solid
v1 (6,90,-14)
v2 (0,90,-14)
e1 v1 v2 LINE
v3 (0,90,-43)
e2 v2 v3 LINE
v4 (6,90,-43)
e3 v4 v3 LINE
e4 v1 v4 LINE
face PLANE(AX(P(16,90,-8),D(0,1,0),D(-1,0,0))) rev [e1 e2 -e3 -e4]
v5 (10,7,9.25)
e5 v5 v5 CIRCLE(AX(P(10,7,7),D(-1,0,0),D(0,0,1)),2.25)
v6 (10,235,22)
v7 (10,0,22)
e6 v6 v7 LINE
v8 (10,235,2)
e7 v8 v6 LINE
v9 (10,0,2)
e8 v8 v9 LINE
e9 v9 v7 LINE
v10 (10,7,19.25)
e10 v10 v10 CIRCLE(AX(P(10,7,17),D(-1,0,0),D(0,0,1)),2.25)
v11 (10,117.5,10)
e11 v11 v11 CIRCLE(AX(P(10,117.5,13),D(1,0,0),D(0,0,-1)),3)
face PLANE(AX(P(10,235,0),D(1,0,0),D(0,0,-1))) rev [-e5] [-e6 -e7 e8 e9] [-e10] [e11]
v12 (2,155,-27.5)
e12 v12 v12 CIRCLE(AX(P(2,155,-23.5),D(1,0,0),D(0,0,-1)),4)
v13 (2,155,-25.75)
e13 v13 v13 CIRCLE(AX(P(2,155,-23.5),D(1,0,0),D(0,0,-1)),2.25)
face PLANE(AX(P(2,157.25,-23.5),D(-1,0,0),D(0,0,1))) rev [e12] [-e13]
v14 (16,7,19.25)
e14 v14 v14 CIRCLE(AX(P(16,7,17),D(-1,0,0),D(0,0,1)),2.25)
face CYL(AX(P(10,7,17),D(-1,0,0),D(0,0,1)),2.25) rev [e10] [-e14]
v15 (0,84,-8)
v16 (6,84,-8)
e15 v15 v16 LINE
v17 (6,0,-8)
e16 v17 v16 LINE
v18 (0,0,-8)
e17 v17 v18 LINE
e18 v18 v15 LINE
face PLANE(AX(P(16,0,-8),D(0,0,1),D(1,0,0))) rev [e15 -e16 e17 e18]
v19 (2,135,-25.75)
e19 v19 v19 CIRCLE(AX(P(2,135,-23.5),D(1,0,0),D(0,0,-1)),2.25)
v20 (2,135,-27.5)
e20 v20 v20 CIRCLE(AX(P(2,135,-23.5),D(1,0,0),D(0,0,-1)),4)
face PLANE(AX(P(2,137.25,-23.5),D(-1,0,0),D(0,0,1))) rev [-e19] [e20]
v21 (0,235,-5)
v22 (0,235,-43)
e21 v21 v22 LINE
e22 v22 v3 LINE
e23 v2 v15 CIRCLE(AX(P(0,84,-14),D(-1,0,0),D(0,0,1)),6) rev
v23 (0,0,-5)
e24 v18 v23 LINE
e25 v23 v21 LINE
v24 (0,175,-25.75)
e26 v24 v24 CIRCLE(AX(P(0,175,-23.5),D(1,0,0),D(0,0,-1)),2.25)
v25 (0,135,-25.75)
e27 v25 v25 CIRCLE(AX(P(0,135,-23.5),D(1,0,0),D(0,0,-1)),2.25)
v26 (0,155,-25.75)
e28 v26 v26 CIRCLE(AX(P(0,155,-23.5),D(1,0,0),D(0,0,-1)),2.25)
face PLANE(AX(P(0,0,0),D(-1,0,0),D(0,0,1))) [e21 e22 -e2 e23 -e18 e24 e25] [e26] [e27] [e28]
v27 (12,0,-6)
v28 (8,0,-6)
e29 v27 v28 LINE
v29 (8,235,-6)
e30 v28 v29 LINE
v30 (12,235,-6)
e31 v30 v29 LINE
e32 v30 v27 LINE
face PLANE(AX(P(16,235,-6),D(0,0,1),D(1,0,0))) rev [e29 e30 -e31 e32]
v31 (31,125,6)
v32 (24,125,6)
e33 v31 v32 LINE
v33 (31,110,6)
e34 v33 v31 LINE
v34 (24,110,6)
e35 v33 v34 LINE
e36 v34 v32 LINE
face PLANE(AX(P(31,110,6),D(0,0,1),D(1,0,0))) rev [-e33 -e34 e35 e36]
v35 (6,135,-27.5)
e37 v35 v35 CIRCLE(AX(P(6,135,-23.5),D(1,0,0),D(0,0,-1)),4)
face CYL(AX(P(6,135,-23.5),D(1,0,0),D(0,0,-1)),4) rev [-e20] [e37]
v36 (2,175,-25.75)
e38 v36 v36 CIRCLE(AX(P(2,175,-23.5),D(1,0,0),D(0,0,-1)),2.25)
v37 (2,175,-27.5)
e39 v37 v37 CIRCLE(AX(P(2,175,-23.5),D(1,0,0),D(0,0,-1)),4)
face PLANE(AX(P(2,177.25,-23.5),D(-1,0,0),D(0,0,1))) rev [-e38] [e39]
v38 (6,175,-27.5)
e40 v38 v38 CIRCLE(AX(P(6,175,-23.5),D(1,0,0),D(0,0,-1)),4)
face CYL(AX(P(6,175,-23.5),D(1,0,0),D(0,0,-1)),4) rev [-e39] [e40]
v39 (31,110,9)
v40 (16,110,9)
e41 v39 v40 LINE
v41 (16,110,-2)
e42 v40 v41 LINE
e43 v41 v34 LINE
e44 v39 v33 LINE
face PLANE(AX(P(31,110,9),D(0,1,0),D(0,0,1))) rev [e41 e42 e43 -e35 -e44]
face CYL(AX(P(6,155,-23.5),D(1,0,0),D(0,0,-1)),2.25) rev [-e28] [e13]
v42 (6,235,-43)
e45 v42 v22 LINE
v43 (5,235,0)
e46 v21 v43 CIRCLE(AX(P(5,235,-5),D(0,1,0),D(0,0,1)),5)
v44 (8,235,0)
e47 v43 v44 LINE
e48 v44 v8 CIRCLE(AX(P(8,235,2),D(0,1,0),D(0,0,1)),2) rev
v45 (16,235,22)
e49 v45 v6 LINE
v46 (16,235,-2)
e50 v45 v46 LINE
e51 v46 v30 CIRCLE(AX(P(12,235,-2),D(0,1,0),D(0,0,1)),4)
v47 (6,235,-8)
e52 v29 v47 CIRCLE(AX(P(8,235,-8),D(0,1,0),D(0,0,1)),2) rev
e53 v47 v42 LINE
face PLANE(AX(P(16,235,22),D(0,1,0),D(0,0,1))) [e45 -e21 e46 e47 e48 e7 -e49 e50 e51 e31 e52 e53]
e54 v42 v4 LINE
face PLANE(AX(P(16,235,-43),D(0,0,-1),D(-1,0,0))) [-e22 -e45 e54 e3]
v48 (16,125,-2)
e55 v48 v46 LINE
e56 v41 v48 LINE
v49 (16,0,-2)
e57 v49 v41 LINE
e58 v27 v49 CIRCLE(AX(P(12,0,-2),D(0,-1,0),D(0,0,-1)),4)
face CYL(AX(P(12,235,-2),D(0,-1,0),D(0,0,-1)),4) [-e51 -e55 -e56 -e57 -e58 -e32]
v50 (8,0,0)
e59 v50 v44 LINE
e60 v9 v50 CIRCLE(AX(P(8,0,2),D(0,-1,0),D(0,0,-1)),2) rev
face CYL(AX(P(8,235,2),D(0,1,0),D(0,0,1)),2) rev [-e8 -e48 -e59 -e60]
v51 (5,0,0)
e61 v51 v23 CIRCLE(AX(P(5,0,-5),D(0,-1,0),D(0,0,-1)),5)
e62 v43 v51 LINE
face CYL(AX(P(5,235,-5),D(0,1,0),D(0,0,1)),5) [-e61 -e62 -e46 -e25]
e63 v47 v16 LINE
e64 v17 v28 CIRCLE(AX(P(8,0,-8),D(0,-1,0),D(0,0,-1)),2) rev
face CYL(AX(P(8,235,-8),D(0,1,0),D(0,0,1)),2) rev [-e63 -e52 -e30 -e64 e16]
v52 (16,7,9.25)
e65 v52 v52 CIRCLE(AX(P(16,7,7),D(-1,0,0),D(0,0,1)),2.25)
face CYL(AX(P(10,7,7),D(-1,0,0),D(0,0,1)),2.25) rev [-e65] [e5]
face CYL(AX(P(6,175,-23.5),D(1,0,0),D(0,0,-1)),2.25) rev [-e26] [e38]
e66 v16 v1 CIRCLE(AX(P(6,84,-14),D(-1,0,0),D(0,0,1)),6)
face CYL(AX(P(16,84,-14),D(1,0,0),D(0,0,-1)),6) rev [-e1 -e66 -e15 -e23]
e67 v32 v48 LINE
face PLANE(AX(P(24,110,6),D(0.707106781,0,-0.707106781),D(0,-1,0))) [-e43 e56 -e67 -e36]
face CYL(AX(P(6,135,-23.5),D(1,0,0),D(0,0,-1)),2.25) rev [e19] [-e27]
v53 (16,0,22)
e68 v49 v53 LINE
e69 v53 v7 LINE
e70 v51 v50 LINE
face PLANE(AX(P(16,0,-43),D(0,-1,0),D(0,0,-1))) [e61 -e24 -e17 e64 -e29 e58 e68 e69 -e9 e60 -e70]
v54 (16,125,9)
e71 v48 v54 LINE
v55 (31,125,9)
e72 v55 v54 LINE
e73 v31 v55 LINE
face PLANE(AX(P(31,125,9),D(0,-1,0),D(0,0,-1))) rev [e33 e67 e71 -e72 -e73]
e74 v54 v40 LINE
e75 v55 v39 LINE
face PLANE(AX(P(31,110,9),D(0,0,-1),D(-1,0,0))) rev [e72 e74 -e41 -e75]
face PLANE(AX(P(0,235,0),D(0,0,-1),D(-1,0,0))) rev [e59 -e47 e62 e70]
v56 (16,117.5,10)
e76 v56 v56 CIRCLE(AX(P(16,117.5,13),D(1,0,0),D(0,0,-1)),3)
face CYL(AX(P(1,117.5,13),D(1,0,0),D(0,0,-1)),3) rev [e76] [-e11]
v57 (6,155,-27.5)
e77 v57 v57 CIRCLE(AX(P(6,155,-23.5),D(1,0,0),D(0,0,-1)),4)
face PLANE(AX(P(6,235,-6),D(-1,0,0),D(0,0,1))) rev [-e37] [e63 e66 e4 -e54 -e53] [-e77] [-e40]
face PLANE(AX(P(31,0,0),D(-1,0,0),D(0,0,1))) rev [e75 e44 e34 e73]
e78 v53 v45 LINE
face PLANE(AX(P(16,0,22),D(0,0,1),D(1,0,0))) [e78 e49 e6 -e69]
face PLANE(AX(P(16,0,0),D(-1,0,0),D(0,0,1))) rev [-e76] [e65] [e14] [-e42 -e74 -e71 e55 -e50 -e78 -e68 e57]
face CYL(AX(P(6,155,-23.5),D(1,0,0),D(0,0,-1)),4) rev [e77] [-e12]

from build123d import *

# Parameters (mm, degrees)
SCHIZZO1_W                                           = 235
SCHIZZO1_H                                           = 65
ESTRUSIONE_ESTRUSIONE1_DEPTH                         = 16
SCHIZZO2_W                                           = 10
SCHIZZO2_H                                           = 37
TAGLIO_ESTRUSIONE1_DEPTH                             = 240.436839271
SCHIZZO3_W                                           = 35
SCHIZZO3_H                                           = 90
TAGLIO_ESTRUSIONE2_DEPTH                             = 240.436839271
SCHIZZO4_W                                           = 10
SCHIZZO4_H                                           = 22
TAGLIO_ESTRUSIONE3_DEPTH                             = 240.436839271
FORO_LAMATO_PER_VITE_M4_A_TESTA_ESAGONAL_D           = 4.5
FORO_LAMATO_PER_VITE_M4_A_TESTA_ESAGONAL_CBORE_D     = 8
FORO_LAMATO_PER_VITE_M4_A_TESTA_ESAGONAL_CBORE_DEPTH = 4
RACCORDO1_R                                          = 2
RACCORDO2_R                                          = 4
RACCORDO3_R                                          = 5
RACCORDO4_R                                          = 6
FORO_PER_VITE_M4_1_D                                 = 4.5
FORO_PER_VITE_M4_1_DEPTH                             = 188
FORO_PER_VITE_M4_1_TIP                               = 1.351936393
SCHIZZO9_W                                           = 3
SCHIZZO9_H                                           = 15
ESTRUSIONE_ESTRUSIONE2_DEPTH                         = 15
SCHIZZO10_R                                          = 3
TAGLIO_ESTRUSIONE4_DEPTH                             = 15
SMUSSO1_SIZE                                         = 8


with BuildPart() as part:
    # Schizzo1 → Estrusione-Estrusione1 (new body)
    with BuildSketch(Plane(origin=(0, 0, 0), x_dir=(0, -1, 0), z_dir=(-1, 0, 0))):
        with Locations((-117.5, -10.5)):
            Rectangle(SCHIZZO1_W, SCHIZZO1_H)
    extrude(amount=-ESTRUSIONE_ESTRUSIONE1_DEPTH)

    # Schizzo2 → Taglio-Estrusione1 (cut, through all)
    with BuildSketch(Plane.XZ):
        with Locations((11, -24.5)):
            Rectangle(SCHIZZO2_W, SCHIZZO2_H)
    extrude(amount=-TAGLIO_ESTRUSIONE1_DEPTH, mode=Mode.SUBTRACT)

    # Schizzo3 → Taglio-Estrusione2 (cut, through all)
    with BuildSketch(Plane.ZY):
        with Locations((-25.5, 45)):
            Rectangle(SCHIZZO3_W, SCHIZZO3_H)
    extrude(amount=-TAGLIO_ESTRUSIONE2_DEPTH, mode=Mode.SUBTRACT)

    # Schizzo4 → Taglio-Estrusione3 (cut, through all)
    with BuildSketch(Plane.XZ):
        with Locations((5, 11)):
            Rectangle(SCHIZZO4_W, SCHIZZO4_H)
    extrude(amount=-TAGLIO_ESTRUSIONE3_DEPTH, mode=Mode.SUBTRACT)

    # Foro lamato per Vite M4 a testa esagonale-1 (through all)
    with Locations(Plane(origin=(6, 0, 0), x_dir=(0, 0, -1), z_dir=(1, 0, 0))):
        with Locations((23.5, 175), (23.5, 155), (23.5, 135)):
            CounterBoreHole(FORO_LAMATO_PER_VITE_M4_A_TESTA_ESAGONAL_D / 2, FORO_LAMATO_PER_VITE_M4_A_TESTA_ESAGONAL_CBORE_D / 2, FORO_LAMATO_PER_VITE_M4_A_TESTA_ESAGONAL_CBORE_DEPTH)

    # Raccordo1
    raccordo1_edges = [part.edges().sort_by_distance(p)[0] for p in [
        (10, 117.5, 0),
        (6, 117.5, -6),
    ]]
    fillet(raccordo1_edges, radius=RACCORDO1_R)

    # Raccordo2
    raccordo2_edges = [part.edges().sort_by_distance(p)[0] for p in [
        (16, 117.5, -6),
    ]]
    fillet(raccordo2_edges, radius=RACCORDO2_R)

    # Raccordo3
    raccordo3_edges = [part.edges().sort_by_distance(p)[0] for p in [
        (0, 117.5, 0),
    ]]
    fillet(raccordo3_edges, radius=RACCORDO3_R)

    # Raccordo4
    raccordo4_edges = [part.edges().sort_by_distance(p)[0] for p in [
        (3, 90, -8),
    ]]
    fillet(raccordo4_edges, radius=RACCORDO4_R)

    # Foro per Vite M4-1
    with Locations(Plane.ZY.offset(-10)):
        with Locations((17, 7), (7, 7)):
            Hole(FORO_PER_VITE_M4_1_D / 2, depth=FORO_PER_VITE_M4_1_DEPTH)
            with Locations((0, 0, -(FORO_PER_VITE_M4_1_DEPTH + FORO_PER_VITE_M4_1_TIP / 2))):  # 118° drill point
                Cone(0, FORO_PER_VITE_M4_1_D / 2, FORO_PER_VITE_M4_1_TIP, mode=Mode.SUBTRACT)

    # Schizzo9 → Estrusione-Estrusione2 (add)
    with BuildSketch(Plane(origin=(16, 0, 0), x_dir=(0, 0, -1), z_dir=(1, 0, 0))):
        with Locations((-7.5, 117.5)):
            Rectangle(SCHIZZO9_W, SCHIZZO9_H)
    extrude(amount=ESTRUSIONE_ESTRUSIONE2_DEPTH)

    # Schizzo10 → Taglio-Estrusione4 (cut)
    with BuildSketch(Plane(origin=(16, 0, 0), x_dir=(0, 0, -1), z_dir=(1, 0, 0))):
        with Locations((-13, 117.5)):
            Circle(SCHIZZO10_R)
    extrude(amount=-TAGLIO_ESTRUSIONE4_DEPTH, mode=Mode.SUBTRACT)

    # Smusso1
    smusso1_edges = [part.edges().sort_by_distance(p)[0] for p in [
        (16, 117.5, 6),
    ]]
    chamfer(smusso1_edges, length=SMUSSO1_SIZE - 0.0001)  # a hair under: the kernel refuses the full size


solid = part.part
